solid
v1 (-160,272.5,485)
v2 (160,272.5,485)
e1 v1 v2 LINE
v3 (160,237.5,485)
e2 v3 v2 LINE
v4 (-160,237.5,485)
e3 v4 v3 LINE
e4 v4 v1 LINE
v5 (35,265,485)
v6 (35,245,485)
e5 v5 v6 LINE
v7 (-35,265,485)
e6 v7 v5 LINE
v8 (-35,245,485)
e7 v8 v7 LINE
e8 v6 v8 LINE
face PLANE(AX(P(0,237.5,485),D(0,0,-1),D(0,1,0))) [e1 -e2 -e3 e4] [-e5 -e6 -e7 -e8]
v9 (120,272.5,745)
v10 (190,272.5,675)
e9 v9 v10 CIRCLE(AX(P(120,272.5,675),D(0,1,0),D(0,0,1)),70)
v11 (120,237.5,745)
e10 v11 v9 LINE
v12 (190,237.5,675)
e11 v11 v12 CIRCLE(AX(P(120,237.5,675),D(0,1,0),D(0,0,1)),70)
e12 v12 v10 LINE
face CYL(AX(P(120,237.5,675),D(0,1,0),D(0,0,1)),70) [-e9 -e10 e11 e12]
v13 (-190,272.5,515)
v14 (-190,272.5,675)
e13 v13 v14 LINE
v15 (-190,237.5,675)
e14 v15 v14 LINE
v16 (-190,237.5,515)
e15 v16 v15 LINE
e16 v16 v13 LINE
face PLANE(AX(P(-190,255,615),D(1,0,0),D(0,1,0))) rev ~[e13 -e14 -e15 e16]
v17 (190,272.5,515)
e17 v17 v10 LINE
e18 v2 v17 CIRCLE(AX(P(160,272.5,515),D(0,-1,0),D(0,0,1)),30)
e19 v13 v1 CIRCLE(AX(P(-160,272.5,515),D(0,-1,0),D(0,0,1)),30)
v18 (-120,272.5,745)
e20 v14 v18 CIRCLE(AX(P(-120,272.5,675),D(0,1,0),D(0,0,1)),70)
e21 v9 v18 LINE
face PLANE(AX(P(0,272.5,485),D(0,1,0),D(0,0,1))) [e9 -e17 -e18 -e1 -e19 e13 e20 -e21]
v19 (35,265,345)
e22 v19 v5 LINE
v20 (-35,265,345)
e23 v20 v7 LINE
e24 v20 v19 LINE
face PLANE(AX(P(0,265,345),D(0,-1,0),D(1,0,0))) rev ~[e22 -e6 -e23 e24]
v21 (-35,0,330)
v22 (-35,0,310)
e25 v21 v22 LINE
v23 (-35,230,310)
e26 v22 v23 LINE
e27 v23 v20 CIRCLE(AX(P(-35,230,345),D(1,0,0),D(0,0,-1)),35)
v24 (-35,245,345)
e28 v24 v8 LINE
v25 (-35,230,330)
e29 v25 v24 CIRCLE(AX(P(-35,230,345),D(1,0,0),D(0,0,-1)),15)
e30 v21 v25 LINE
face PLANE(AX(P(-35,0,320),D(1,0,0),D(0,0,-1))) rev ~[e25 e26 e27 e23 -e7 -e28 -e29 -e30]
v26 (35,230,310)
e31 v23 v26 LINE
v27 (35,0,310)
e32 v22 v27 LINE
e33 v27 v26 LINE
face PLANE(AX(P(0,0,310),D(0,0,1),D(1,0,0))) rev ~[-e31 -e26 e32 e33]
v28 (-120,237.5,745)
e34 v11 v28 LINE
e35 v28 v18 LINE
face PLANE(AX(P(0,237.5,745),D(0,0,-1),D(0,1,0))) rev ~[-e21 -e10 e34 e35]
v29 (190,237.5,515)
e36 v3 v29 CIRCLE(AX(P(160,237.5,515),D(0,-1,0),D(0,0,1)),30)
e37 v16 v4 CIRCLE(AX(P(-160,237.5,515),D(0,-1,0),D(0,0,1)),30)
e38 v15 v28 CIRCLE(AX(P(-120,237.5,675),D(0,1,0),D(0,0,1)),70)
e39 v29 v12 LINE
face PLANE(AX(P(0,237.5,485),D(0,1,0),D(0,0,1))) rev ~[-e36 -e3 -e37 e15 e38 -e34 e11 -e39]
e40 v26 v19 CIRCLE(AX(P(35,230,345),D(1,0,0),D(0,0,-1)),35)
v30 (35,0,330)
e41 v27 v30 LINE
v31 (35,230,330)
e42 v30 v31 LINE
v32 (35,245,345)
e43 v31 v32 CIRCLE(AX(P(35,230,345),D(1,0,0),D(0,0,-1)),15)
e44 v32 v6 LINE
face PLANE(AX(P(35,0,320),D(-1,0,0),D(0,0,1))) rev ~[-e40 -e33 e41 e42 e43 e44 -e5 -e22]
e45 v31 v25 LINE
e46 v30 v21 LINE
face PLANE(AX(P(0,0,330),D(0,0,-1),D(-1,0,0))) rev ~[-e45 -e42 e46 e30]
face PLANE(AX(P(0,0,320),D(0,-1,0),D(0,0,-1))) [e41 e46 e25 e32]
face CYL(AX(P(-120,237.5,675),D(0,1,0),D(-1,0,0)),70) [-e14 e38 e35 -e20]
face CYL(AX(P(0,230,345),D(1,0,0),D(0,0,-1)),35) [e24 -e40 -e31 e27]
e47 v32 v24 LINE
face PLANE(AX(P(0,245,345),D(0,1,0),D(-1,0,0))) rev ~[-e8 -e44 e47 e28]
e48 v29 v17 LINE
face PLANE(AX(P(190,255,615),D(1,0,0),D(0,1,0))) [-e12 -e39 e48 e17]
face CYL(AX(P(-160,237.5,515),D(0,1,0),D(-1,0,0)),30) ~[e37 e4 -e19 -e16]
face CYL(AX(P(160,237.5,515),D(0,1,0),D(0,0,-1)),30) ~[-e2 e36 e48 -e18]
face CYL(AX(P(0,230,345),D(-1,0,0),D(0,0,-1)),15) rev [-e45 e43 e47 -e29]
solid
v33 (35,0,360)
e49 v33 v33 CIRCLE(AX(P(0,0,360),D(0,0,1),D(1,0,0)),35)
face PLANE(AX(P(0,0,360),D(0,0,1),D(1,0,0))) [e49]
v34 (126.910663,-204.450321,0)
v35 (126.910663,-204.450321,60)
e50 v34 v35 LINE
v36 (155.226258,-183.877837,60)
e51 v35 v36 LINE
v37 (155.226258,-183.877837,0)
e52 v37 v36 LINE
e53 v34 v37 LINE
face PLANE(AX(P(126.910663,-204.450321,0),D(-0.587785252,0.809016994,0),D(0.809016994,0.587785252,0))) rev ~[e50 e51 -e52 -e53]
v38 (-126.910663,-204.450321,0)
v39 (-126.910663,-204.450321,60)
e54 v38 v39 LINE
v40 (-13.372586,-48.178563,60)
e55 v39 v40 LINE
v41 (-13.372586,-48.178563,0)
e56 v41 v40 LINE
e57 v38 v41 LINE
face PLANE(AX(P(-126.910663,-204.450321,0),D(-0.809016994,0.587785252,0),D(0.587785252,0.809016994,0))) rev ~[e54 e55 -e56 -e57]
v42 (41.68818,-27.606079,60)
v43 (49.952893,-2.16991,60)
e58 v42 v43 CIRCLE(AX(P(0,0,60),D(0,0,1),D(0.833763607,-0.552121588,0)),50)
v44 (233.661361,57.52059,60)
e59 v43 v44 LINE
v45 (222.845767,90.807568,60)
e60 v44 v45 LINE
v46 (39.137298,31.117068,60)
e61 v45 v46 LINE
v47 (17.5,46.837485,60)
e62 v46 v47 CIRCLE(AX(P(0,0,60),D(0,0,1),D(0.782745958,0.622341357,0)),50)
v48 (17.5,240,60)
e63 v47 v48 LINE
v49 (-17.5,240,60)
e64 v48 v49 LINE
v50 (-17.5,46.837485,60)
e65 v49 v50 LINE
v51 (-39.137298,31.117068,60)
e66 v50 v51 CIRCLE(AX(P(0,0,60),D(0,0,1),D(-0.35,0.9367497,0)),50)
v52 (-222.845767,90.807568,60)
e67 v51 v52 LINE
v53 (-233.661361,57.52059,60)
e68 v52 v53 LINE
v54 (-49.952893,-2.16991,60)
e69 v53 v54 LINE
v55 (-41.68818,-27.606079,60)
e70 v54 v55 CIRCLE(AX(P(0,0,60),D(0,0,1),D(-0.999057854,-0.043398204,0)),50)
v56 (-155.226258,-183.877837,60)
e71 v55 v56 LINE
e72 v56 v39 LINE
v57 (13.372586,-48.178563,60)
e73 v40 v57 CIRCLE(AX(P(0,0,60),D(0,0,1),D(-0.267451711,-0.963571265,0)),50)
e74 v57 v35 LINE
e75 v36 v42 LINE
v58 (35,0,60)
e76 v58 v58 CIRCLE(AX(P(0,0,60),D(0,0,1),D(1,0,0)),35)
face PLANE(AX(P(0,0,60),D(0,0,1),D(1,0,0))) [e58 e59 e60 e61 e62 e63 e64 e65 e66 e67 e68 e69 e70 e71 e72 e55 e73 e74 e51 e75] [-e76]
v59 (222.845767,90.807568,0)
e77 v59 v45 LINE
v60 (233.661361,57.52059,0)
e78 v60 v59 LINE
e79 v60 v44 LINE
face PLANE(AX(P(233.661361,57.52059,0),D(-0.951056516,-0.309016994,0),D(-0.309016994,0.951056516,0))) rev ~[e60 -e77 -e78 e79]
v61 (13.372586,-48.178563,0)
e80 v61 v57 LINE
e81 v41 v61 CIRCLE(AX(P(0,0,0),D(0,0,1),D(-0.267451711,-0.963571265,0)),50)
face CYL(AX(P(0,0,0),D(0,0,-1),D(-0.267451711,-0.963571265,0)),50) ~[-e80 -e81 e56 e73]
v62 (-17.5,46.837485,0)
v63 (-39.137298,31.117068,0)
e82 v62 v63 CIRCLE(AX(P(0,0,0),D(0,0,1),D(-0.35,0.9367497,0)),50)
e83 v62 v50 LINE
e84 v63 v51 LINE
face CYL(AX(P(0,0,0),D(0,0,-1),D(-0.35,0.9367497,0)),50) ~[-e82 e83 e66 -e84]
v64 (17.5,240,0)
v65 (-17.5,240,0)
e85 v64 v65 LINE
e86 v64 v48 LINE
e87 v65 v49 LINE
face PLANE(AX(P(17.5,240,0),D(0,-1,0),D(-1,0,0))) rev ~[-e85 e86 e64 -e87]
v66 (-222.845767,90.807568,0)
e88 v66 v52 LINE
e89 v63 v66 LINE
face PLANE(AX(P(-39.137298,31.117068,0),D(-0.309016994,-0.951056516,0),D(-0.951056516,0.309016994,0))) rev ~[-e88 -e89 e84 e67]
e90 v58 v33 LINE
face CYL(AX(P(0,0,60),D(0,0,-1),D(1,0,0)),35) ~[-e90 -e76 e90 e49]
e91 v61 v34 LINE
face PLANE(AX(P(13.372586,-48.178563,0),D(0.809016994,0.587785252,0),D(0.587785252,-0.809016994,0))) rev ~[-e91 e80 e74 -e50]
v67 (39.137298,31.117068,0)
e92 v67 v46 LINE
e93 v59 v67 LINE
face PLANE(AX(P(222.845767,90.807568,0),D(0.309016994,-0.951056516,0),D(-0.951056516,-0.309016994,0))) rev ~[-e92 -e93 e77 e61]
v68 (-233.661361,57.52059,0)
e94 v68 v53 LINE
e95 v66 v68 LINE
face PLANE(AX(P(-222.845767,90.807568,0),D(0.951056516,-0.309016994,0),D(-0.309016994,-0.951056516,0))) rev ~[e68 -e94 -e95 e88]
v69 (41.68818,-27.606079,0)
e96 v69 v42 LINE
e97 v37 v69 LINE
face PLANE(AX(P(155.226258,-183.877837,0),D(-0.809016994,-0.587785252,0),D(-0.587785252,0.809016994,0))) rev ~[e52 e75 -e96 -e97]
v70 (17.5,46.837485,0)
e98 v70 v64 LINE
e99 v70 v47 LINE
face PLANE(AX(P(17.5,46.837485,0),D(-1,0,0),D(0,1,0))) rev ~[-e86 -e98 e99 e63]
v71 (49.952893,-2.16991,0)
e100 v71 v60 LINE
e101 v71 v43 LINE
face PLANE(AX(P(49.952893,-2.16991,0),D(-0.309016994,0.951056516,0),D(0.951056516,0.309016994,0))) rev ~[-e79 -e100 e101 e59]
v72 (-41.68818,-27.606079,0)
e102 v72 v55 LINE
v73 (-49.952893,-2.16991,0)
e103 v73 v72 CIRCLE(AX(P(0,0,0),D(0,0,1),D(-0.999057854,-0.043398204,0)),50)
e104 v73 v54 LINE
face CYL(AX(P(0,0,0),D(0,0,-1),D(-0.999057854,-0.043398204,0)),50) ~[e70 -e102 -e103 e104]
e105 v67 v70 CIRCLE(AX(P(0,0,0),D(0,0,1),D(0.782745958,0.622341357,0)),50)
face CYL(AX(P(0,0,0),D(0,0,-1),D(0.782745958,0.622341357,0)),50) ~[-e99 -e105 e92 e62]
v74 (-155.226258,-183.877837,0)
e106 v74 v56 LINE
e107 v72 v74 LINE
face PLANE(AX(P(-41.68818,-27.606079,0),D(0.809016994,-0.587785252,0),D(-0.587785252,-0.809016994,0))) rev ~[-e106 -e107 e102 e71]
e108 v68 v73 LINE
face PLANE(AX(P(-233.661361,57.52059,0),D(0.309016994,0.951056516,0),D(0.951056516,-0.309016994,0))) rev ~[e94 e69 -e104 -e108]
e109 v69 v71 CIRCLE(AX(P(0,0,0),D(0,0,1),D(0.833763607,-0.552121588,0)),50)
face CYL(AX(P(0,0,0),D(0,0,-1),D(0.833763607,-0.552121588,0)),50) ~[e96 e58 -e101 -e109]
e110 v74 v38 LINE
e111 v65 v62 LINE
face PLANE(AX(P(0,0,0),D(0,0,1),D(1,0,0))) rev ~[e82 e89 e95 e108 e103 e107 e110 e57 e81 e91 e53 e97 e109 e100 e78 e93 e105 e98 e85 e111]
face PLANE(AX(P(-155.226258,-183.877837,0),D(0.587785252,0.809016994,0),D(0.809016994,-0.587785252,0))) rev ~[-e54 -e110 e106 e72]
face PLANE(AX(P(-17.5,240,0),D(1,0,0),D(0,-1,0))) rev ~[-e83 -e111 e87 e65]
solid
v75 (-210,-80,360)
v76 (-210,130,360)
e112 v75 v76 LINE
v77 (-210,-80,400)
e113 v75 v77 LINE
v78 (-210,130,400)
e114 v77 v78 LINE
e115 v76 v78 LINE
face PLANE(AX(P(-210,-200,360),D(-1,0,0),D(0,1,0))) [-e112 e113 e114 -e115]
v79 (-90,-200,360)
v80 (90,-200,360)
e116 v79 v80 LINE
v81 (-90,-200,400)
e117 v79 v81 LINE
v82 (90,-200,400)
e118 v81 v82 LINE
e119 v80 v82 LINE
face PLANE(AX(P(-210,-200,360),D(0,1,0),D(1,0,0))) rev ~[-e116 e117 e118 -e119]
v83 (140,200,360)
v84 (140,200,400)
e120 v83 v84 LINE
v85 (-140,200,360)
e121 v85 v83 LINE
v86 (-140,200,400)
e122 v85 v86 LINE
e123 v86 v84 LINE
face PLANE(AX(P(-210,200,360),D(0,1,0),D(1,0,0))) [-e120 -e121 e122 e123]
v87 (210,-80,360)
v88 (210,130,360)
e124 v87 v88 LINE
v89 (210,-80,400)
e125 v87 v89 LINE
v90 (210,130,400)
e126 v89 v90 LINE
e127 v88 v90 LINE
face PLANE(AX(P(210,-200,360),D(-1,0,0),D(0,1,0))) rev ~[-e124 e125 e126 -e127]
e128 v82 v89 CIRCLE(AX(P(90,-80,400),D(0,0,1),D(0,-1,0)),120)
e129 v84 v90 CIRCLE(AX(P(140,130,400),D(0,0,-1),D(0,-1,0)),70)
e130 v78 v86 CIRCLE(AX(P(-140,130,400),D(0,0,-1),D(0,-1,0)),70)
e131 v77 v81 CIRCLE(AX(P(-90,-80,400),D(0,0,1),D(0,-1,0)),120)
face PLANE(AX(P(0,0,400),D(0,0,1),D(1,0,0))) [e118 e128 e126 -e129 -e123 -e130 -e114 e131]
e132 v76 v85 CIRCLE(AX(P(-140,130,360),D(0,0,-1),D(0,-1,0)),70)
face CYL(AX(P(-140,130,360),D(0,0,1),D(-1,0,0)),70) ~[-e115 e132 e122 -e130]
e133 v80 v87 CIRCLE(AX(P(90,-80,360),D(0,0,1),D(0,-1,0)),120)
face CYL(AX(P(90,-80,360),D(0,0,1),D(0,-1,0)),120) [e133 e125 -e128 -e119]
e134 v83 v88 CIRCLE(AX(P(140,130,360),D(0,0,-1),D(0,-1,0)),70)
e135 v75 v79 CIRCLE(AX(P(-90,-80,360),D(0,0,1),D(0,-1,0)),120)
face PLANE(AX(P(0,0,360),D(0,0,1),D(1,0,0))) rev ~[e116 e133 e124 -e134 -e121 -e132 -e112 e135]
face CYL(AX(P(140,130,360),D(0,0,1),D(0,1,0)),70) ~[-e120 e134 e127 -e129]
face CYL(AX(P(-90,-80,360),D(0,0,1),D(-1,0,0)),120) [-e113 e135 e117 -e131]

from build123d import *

# Parameters (mm, degrees)
F1_DEPTH  = 60
F2_R      = 35
F3_DEPTH  = 300
F4_W      = 420
F4_H      = 400
F5_DEPTH  = 40
F6_R      = 120
F7_R      = 70
F8_W      = 70
F8_H      = 20
F11_W     = 35
F11_H     = 260
F12_DEPTH = 190
F13_R     = 70
F14_R     = 30


with BuildPart() as f1:
    # F0 (on Top) → F1 (new body)
    with BuildSketch(Plane.XY):
        with BuildLine():
            Line((-233.6613613124, 57.5205896148), (-49.9528927063, -2.1699102001))
            ThreePointArc((-49.9528927063, -2.1699102001), (-47.5528258148, -15.4508497187), (-41.688180332, -27.6060794139))
            Line((-41.688180332, -27.6060794139), (-155.2262579518, -183.8778367349))
            Line((-155.2262579518, -183.8778367349), (-126.9106631486, -204.4503205651))
            Line((-126.9106631486, -204.4503205651), (-13.3725855288, -48.1785632442))
            ThreePointArc((-13.3725855288, -48.1785632442), (0, -50), (13.3725855288, -48.1785632442))
            Line((13.3725855288, -48.1785632442), (126.9106631486, -204.4503205651))
            Line((126.9106631486, -204.4503205651), (155.2262579518, -183.8778367349))
            Line((155.2262579518, -183.8778367349), (41.688180332, -27.6060794139))
            ThreePointArc((41.688180332, -27.6060794139), (47.5528258148, -15.4508497187), (49.9528927063, -2.1699102001))
            Line((49.9528927063, -2.1699102001), (233.6613613124, 57.5205896148))
            Line((233.6613613124, 57.5205896148), (222.8457665093, 90.8075676852))
            Line((222.8457665093, 90.8075676852), (39.1372979031, 31.1170678702))
            ThreePointArc((39.1372979031, 31.1170678702), (29.3892626146, 40.4508497187), (17.5, 46.837484988))
            Line((17.5, 46.837484988), (17.5, 240))
            Line((17.5, 240), (-17.5, 240))
            Line((-17.5, 240), (-17.5, 46.837484988))
            ThreePointArc((-17.5, 46.837484988), (-29.3892626146, 40.4508497187), (-39.1372979031, 31.1170678702))
            Line((-39.1372979031, 31.1170678702), (-222.8457665093, 90.8075676852))
            Line((-222.8457665093, 90.8075676852), (-233.6613613124, 57.5205896148))
        make_face()
    extrude(amount=F1_DEPTH)

    # F2 (on face) → F3 (join)
    with BuildSketch(Plane.XY.offset(60)):
        Circle(F2_R)
    extrude(amount=F3_DEPTH)


with BuildPart() as f5:
    # F4 (on face) → F5 (new body)
    with BuildSketch(Plane.XY.offset(360)):
        Rectangle(F4_W, F4_H)
    extrude(amount=F5_DEPTH)

    # F6
    f6_edges = [f5.edges().sort_by_distance(p)[0] for p in [
        (210, -200, 380),
        (-210, -200, 380),
    ]]
    fillet(f6_edges, radius=F6_R)

    # F7
    f7_edges = [f5.edges().sort_by_distance(p)[0] for p in [
        (210, 200, 380),
        (-210, 200, 380),
    ]]
    fillet(f7_edges, radius=F7_R)


with BuildPart() as f10:
    # F10: sweep along a path in F9
    with BuildLine(Plane.YZ) as f10_path:
        Line((0, 315), (230, 315))
        ThreePointArc((230, 315), (251.2132034356, 323.7867965644), (260, 345))
        Line((260, 345), (260, 485))
    # F8 (on Front) → F10 (sweep)
    with BuildSketch(Plane.XZ):
        with Locations((0, 320)):
            Rectangle(F8_W, F8_H)
    sweep(path=f10_path.line)

    # F11 (on Right) → F12 (join, symmetric)
    with BuildSketch(Plane.YZ):
        with Locations((255, 615)):
            Rectangle(F11_W, F11_H)
    extrude(amount=F12_DEPTH, both=True)

    # F13
    f13_edges = [f10.edges().sort_by_distance(p)[0] for p in [
        (190, 255, 745),
        (-190, 255, 745),
    ]]
    fillet(f13_edges, radius=F13_R)

    # F14
    f14_edges = [f10.edges().sort_by_distance(p)[0] for p in [
        (-190, 255, 485),
        (190, 255, 485),
    ]]
    fillet(f14_edges, radius=F14_R)


solid = Compound([f1.part, f5.part, f10.part])
